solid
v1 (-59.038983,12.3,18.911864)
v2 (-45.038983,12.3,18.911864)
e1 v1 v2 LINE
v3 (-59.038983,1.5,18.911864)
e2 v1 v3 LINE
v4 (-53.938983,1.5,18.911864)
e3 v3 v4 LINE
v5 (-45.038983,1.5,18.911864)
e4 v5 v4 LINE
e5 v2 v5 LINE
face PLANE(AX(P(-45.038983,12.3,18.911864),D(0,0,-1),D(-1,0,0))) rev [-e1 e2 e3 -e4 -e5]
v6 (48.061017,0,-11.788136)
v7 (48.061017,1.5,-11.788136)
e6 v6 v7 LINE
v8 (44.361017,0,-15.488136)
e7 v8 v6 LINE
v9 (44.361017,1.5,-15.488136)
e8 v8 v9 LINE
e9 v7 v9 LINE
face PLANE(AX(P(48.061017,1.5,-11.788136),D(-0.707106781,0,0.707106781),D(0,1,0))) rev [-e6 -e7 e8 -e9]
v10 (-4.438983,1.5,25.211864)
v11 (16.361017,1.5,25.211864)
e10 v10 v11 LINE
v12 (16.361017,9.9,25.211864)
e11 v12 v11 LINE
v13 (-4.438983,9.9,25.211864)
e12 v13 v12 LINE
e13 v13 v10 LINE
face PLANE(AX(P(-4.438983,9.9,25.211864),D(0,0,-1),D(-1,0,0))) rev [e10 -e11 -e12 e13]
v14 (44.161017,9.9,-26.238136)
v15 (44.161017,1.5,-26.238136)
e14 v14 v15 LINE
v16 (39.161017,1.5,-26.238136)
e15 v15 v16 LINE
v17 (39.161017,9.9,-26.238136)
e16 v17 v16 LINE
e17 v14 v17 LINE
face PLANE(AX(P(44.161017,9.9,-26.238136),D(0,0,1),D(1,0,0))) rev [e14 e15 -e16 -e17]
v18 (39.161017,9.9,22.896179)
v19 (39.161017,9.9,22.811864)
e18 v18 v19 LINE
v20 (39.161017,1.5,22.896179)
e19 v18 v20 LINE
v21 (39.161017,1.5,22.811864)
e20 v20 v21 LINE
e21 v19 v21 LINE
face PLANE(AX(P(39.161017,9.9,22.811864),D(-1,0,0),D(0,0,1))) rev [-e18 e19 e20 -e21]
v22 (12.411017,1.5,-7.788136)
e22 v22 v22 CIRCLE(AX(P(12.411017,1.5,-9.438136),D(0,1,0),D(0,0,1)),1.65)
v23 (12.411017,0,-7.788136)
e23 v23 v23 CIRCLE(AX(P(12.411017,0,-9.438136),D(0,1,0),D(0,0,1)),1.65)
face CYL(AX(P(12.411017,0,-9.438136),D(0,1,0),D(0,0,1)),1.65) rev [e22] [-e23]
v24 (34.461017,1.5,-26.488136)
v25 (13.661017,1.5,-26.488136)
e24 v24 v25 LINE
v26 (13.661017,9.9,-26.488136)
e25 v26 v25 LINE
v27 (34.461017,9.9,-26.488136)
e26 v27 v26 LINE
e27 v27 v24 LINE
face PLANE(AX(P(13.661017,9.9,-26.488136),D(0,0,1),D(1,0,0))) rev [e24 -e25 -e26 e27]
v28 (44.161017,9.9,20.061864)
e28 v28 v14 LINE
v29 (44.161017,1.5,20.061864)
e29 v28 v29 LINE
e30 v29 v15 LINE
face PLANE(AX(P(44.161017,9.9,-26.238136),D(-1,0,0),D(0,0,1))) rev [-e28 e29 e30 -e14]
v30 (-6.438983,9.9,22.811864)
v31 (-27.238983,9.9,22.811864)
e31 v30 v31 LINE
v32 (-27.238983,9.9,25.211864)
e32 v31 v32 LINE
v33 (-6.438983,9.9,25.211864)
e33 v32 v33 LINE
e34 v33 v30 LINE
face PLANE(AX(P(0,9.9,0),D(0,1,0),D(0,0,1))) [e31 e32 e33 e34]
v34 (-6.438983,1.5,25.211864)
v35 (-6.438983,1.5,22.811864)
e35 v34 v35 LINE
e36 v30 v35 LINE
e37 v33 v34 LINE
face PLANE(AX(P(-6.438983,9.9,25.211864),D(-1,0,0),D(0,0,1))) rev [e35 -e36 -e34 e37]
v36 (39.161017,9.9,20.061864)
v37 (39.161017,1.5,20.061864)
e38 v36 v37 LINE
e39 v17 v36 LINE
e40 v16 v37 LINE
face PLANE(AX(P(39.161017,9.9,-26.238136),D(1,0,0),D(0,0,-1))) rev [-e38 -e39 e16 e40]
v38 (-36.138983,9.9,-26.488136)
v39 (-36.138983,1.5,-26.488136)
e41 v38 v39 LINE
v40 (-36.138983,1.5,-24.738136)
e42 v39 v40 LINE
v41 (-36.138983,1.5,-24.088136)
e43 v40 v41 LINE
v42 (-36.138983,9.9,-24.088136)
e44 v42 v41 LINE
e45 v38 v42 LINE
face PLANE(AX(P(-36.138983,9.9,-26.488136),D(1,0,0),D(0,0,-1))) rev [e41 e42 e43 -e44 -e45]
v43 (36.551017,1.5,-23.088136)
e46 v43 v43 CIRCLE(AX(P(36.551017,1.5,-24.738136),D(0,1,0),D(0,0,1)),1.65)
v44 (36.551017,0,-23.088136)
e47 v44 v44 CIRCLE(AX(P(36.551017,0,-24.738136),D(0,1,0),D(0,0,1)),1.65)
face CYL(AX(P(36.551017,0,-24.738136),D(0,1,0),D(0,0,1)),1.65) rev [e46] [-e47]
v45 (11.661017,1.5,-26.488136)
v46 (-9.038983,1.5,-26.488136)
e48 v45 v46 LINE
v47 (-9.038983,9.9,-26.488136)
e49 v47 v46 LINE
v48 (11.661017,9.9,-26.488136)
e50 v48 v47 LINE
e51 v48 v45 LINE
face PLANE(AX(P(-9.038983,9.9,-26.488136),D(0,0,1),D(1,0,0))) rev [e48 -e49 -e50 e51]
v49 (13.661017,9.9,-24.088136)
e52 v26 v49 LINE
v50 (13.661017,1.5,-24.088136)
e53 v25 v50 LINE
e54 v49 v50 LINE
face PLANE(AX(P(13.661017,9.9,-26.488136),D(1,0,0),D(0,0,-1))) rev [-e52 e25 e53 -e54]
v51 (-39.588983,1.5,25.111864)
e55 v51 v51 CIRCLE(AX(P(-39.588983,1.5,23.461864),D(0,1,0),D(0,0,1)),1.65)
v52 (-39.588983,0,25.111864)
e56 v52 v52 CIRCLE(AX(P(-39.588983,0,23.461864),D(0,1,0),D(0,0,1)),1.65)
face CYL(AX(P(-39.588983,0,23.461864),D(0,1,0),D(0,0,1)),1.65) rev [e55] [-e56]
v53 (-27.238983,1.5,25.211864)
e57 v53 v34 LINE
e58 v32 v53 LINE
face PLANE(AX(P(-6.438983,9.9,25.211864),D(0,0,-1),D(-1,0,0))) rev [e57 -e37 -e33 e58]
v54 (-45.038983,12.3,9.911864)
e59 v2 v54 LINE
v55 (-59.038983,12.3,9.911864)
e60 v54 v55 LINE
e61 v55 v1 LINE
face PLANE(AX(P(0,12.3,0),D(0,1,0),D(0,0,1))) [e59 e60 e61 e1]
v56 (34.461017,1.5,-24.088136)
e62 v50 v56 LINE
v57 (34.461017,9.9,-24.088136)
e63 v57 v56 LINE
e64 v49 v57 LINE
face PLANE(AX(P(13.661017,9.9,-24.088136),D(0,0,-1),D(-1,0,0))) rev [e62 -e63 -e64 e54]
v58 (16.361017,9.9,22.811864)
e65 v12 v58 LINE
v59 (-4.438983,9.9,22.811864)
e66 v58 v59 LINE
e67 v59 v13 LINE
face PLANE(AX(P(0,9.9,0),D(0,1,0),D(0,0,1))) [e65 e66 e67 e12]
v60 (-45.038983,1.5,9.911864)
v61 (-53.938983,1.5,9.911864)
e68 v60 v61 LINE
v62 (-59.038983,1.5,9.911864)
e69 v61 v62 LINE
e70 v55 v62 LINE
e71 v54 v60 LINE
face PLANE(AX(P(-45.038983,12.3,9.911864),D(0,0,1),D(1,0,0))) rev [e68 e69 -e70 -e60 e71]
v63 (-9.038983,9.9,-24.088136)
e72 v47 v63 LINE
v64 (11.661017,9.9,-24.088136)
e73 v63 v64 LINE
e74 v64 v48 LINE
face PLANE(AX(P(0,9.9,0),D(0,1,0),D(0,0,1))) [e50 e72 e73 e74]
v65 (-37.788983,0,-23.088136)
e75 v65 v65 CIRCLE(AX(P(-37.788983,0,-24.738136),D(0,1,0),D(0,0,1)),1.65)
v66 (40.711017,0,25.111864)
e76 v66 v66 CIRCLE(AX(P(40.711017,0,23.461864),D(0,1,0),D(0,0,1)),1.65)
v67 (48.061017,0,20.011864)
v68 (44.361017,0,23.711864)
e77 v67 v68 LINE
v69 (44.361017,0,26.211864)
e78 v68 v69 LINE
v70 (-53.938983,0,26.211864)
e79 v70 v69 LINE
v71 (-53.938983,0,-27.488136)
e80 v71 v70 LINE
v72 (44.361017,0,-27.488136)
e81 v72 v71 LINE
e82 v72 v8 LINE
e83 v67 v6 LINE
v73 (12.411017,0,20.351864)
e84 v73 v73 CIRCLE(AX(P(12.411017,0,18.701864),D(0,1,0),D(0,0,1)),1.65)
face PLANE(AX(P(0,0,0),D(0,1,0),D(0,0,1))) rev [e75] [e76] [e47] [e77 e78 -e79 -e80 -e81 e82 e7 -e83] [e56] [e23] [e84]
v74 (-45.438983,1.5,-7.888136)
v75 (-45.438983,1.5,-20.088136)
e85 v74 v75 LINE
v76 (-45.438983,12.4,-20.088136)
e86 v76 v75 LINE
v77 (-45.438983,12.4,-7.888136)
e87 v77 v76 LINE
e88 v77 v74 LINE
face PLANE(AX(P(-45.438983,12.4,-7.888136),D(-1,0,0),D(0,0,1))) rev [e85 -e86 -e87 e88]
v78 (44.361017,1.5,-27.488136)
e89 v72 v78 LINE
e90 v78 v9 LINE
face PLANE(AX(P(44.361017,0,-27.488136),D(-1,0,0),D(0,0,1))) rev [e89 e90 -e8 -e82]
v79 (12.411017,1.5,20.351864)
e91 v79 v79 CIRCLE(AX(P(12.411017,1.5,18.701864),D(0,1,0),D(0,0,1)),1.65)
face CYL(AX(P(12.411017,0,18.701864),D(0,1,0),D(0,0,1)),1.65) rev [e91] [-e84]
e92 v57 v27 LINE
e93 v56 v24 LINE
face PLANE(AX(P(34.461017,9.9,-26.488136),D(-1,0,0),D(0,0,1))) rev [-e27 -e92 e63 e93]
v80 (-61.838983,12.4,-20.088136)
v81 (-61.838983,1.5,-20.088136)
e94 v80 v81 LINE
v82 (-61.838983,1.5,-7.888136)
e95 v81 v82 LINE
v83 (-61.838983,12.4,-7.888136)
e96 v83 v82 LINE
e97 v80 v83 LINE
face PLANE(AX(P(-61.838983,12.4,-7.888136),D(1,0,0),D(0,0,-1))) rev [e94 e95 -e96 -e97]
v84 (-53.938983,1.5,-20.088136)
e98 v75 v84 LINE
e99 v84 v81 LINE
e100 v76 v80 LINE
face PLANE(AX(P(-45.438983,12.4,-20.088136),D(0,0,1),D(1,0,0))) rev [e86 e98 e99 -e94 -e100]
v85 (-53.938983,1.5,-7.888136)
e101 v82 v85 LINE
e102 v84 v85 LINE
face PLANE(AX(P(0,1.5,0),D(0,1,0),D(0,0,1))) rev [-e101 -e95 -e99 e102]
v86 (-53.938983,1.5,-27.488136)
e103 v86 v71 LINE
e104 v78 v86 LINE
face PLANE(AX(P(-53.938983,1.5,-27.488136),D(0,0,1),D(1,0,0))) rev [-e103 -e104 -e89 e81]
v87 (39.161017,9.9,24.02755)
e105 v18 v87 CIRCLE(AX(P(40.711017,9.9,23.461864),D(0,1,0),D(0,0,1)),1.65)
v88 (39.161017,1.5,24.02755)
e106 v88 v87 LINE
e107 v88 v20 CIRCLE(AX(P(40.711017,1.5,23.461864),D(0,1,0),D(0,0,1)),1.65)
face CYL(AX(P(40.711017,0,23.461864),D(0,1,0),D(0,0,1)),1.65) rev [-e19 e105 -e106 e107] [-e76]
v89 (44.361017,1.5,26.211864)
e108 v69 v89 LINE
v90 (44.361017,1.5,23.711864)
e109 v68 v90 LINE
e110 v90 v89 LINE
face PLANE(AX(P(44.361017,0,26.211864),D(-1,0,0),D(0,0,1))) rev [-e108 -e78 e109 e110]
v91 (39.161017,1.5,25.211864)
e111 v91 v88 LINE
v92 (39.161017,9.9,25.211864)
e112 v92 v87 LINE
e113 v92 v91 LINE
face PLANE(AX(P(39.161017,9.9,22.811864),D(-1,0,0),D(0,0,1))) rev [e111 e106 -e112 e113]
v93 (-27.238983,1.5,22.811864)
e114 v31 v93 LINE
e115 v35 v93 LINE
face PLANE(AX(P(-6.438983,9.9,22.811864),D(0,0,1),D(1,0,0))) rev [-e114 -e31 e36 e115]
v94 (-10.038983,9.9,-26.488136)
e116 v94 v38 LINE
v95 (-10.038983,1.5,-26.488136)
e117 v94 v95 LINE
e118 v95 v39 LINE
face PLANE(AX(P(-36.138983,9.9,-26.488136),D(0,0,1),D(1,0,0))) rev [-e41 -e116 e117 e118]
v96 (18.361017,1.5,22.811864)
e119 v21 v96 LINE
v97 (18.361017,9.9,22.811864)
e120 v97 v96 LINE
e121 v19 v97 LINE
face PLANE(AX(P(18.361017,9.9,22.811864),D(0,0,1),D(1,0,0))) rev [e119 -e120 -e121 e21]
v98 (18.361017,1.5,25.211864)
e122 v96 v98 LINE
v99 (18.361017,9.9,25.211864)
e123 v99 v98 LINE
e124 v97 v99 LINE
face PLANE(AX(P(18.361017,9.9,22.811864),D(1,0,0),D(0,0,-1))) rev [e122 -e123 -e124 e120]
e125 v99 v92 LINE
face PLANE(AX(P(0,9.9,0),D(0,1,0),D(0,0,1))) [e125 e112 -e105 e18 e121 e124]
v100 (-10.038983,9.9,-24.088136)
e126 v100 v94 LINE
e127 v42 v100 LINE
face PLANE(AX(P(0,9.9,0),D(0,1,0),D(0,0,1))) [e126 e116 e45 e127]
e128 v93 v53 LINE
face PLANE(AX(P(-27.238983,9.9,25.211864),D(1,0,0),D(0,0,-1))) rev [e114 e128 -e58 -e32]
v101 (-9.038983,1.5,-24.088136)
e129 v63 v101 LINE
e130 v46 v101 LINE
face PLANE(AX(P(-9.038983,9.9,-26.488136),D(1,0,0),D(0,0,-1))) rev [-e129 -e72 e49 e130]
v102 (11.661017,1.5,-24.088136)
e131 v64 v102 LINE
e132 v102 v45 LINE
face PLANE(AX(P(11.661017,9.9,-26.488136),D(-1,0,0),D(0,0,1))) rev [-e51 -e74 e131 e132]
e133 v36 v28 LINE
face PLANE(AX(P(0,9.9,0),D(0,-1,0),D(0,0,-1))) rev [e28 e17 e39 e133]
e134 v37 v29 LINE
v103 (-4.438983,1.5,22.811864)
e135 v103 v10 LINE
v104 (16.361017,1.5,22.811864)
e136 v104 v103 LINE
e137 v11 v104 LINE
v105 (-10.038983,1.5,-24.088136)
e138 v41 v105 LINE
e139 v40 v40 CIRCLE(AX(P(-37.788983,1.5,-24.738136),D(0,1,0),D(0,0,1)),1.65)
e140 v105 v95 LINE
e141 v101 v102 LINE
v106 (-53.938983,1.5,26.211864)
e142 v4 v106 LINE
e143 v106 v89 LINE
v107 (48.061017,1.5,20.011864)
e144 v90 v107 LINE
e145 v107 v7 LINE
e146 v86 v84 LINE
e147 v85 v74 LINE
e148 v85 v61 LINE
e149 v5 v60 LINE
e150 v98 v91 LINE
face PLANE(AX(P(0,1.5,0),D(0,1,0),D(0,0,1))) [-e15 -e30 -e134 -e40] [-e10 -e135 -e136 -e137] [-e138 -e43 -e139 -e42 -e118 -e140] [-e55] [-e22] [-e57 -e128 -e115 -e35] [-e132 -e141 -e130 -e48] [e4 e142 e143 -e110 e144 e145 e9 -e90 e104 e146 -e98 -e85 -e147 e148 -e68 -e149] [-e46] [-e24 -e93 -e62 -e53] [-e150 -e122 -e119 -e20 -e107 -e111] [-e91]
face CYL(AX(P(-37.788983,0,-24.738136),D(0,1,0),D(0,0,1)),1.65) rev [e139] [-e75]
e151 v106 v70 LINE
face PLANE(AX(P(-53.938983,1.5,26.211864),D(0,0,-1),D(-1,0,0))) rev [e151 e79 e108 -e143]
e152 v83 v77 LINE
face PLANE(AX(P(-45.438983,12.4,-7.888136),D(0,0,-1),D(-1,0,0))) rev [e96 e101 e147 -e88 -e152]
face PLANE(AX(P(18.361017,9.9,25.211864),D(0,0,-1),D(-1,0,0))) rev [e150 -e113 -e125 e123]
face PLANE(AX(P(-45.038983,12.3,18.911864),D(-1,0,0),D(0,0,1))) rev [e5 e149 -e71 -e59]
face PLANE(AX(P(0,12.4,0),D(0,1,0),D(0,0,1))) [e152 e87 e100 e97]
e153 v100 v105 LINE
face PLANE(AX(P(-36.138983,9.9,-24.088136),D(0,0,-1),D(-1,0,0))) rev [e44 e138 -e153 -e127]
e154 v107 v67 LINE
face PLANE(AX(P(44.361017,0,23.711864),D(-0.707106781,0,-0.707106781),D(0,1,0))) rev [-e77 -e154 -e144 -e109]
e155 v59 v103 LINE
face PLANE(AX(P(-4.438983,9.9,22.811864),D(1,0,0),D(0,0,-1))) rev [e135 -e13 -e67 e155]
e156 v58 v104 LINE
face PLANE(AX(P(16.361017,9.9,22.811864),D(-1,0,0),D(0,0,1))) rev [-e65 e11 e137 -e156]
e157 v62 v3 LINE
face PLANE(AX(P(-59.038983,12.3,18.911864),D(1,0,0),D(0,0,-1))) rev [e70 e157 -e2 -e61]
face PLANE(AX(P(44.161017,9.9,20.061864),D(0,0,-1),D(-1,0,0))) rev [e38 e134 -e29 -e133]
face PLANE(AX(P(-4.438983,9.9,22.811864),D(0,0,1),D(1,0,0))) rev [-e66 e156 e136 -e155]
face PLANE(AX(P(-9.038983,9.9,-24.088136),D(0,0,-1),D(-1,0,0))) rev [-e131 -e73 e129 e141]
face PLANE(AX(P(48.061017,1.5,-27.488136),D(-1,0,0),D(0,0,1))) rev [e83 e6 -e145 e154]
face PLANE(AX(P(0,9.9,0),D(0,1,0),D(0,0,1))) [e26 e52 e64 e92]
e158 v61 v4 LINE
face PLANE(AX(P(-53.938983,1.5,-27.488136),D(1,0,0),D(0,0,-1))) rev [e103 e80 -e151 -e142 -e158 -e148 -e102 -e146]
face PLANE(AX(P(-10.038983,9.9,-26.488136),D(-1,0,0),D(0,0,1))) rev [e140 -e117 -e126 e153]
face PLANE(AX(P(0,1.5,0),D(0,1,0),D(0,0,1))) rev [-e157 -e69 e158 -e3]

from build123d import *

# Parameters (mm, degrees)
SKETCH_2_W               = 102
SKETCH_2_H               = 53.7
EXTRUDE_1_DEPTH          = 1.5
SKETCH_3_W               = 16.4
SKETCH_3_H               = 12.2
EXTRUDE_2_DEPTH          = 10.9
SKETCH_5_W               = 14
SKETCH_5_H               = 9
EXTRUDE_3_DEPTH          = 10.8
SKETCH_6_W               = 20.8
SKETCH_6_H               = 2.4
SKETCH_6_W_2             = 26.1
SKETCH_6_W_3             = 20.7
SKETCH_6_W_4             = 5
SKETCH_6_H_2             = 46.3
EXTRUDE_6_DEPTH          = 8.4
SKETCH_9_W               = 3.7
SKETCH_9_H               = 12
SKETCH_9_H_2             = 2.5
CUT_EXTRUDE_1_DEPTH      = 69.545367627
CHAMFER_1_SIZE           = 3.7
CUT_EXTRUDE_2_DEPTH      = 69.545367627
CUT_EXTRUDE_2_DEPTH_BACK = 69.545367627
SKETCH_7_R               = 1.65


with BuildPart() as part:
    # Эскиз2 → Бобышка-Вытянуть1 (new body)
    with BuildSketch(Plane(origin=(0, 0, 0), x_dir=(1, 0, 0), z_dir=(0, 1, 0))):
        with Locations((-2.938983051, 0.638135593)):
            Rectangle(SKETCH_2_W, SKETCH_2_H)
    extrude(amount=EXTRUDE_1_DEPTH)

    # Эскиз3 → Бобышка-Вытянуть2 (add)
    with BuildSketch(Plane(origin=(0, 1.5, 0), x_dir=(1, 0, 0), z_dir=(0, 1, 0))):
        with Locations((-53.638983051, 13.988135593)):
            Rectangle(SKETCH_3_W, SKETCH_3_H)
    extrude(amount=EXTRUDE_2_DEPTH)

    # Эскиз5 → Бобышка-Вытянуть3 (add)
    with BuildSketch(Plane(origin=(0, 1.5, 0), x_dir=(1, 0, 0), z_dir=(0, 1, 0))):
        with Locations((-52.038983051, -14.411864407)):
            Rectangle(SKETCH_5_W, SKETCH_5_H)
    extrude(amount=EXTRUDE_3_DEPTH)

    # Эскиз6 → Бобышка-Вытянуть6 (add)
    with BuildSketch(Plane(origin=(0, 1.5, 0), x_dir=(1, 0, 0), z_dir=(0, 1, 0))):
        with Locations((-16.838983051, -24.011864407)):
            Rectangle(SKETCH_6_W, SKETCH_6_H)
        with Locations((5.961016949, -24.011864407)):
            Rectangle(SKETCH_6_W, SKETCH_6_H)
        with Locations((28.761016949, -24.011864407)):
            Rectangle(SKETCH_6_W, SKETCH_6_H)
        with Locations((-23.088983051, 25.288135593)):
            Rectangle(SKETCH_6_W_2, SKETCH_6_H)
        with Locations((1.311016949, 25.288135593)):
            Rectangle(SKETCH_6_W_3, SKETCH_6_H)
        with Locations((24.061016949, 25.288135593)):
            Rectangle(SKETCH_6_W, SKETCH_6_H)
        with Locations((41.661016949, 3.088135593)):
            Rectangle(SKETCH_6_W_4, SKETCH_6_H_2)
    extrude(amount=EXTRUDE_6_DEPTH)

    # Эскиз9 → Вырез-Вытянуть1 (cut, through all)
    with BuildSketch(Plane(origin=(0, 1.5, 0), x_dir=(1, 0, 0), z_dir=(0, 1, 0))):
        with Locations((46.211016949, 21.488135593)):
            Rectangle(SKETCH_9_W, SKETCH_9_H)
        with Locations((46.211016949, -24.961864407)):
            Rectangle(SKETCH_9_W, SKETCH_9_H_2)
    extrude(amount=-CUT_EXTRUDE_1_DEPTH, mode=Mode.SUBTRACT)

    # Фаска1
    chamfer_1_edges = [part.edges().sort_by_distance(p)[0] for p in [
        (48.061016949, 0.75, 23.711864407),
        (48.061016949, 0.75, -15.488135593),
    ]]
    chamfer(chamfer_1_edges, length=CHAMFER_1_SIZE - 0.0001)  # a hair under: the kernel refuses the full size

    # Эскиз7 → Вырез-Вытянуть2 (cut, two sides: drawn at the far end of the back side and taken through both)
    with BuildSketch(Plane(origin=(0, 1.5, 0), x_dir=(1, 0, 0), z_dir=(0, 1, 0)).offset(-CUT_EXTRUDE_2_DEPTH_BACK)):
        with Locations(Location((-37.788983051, 24.738135593, 0), (0, 0, 270))):
            Circle(SKETCH_7_R)
        with Locations(Location((-39.588983051, -23.461864407, 0), (0, 0, 270))):
            Circle(SKETCH_7_R)
        with Locations(Location((12.411016949, 9.438135593, 0), (0, 0, 270))):
            Circle(SKETCH_7_R)
        with Locations(Location((12.411016949, -18.701864407, 0), (0, 0, 270))):
            Circle(SKETCH_7_R)
        with Locations(Location((36.551016949, 24.738135593, 0), (0, 0, 270))):
            Circle(SKETCH_7_R)
        with Locations(Location((40.711016949, -23.461864407, 0), (0, 0, 270))):
            Circle(SKETCH_7_R)
    extrude(amount=CUT_EXTRUDE_2_DEPTH + CUT_EXTRUDE_2_DEPTH_BACK, mode=Mode.SUBTRACT)


solid = part.part
